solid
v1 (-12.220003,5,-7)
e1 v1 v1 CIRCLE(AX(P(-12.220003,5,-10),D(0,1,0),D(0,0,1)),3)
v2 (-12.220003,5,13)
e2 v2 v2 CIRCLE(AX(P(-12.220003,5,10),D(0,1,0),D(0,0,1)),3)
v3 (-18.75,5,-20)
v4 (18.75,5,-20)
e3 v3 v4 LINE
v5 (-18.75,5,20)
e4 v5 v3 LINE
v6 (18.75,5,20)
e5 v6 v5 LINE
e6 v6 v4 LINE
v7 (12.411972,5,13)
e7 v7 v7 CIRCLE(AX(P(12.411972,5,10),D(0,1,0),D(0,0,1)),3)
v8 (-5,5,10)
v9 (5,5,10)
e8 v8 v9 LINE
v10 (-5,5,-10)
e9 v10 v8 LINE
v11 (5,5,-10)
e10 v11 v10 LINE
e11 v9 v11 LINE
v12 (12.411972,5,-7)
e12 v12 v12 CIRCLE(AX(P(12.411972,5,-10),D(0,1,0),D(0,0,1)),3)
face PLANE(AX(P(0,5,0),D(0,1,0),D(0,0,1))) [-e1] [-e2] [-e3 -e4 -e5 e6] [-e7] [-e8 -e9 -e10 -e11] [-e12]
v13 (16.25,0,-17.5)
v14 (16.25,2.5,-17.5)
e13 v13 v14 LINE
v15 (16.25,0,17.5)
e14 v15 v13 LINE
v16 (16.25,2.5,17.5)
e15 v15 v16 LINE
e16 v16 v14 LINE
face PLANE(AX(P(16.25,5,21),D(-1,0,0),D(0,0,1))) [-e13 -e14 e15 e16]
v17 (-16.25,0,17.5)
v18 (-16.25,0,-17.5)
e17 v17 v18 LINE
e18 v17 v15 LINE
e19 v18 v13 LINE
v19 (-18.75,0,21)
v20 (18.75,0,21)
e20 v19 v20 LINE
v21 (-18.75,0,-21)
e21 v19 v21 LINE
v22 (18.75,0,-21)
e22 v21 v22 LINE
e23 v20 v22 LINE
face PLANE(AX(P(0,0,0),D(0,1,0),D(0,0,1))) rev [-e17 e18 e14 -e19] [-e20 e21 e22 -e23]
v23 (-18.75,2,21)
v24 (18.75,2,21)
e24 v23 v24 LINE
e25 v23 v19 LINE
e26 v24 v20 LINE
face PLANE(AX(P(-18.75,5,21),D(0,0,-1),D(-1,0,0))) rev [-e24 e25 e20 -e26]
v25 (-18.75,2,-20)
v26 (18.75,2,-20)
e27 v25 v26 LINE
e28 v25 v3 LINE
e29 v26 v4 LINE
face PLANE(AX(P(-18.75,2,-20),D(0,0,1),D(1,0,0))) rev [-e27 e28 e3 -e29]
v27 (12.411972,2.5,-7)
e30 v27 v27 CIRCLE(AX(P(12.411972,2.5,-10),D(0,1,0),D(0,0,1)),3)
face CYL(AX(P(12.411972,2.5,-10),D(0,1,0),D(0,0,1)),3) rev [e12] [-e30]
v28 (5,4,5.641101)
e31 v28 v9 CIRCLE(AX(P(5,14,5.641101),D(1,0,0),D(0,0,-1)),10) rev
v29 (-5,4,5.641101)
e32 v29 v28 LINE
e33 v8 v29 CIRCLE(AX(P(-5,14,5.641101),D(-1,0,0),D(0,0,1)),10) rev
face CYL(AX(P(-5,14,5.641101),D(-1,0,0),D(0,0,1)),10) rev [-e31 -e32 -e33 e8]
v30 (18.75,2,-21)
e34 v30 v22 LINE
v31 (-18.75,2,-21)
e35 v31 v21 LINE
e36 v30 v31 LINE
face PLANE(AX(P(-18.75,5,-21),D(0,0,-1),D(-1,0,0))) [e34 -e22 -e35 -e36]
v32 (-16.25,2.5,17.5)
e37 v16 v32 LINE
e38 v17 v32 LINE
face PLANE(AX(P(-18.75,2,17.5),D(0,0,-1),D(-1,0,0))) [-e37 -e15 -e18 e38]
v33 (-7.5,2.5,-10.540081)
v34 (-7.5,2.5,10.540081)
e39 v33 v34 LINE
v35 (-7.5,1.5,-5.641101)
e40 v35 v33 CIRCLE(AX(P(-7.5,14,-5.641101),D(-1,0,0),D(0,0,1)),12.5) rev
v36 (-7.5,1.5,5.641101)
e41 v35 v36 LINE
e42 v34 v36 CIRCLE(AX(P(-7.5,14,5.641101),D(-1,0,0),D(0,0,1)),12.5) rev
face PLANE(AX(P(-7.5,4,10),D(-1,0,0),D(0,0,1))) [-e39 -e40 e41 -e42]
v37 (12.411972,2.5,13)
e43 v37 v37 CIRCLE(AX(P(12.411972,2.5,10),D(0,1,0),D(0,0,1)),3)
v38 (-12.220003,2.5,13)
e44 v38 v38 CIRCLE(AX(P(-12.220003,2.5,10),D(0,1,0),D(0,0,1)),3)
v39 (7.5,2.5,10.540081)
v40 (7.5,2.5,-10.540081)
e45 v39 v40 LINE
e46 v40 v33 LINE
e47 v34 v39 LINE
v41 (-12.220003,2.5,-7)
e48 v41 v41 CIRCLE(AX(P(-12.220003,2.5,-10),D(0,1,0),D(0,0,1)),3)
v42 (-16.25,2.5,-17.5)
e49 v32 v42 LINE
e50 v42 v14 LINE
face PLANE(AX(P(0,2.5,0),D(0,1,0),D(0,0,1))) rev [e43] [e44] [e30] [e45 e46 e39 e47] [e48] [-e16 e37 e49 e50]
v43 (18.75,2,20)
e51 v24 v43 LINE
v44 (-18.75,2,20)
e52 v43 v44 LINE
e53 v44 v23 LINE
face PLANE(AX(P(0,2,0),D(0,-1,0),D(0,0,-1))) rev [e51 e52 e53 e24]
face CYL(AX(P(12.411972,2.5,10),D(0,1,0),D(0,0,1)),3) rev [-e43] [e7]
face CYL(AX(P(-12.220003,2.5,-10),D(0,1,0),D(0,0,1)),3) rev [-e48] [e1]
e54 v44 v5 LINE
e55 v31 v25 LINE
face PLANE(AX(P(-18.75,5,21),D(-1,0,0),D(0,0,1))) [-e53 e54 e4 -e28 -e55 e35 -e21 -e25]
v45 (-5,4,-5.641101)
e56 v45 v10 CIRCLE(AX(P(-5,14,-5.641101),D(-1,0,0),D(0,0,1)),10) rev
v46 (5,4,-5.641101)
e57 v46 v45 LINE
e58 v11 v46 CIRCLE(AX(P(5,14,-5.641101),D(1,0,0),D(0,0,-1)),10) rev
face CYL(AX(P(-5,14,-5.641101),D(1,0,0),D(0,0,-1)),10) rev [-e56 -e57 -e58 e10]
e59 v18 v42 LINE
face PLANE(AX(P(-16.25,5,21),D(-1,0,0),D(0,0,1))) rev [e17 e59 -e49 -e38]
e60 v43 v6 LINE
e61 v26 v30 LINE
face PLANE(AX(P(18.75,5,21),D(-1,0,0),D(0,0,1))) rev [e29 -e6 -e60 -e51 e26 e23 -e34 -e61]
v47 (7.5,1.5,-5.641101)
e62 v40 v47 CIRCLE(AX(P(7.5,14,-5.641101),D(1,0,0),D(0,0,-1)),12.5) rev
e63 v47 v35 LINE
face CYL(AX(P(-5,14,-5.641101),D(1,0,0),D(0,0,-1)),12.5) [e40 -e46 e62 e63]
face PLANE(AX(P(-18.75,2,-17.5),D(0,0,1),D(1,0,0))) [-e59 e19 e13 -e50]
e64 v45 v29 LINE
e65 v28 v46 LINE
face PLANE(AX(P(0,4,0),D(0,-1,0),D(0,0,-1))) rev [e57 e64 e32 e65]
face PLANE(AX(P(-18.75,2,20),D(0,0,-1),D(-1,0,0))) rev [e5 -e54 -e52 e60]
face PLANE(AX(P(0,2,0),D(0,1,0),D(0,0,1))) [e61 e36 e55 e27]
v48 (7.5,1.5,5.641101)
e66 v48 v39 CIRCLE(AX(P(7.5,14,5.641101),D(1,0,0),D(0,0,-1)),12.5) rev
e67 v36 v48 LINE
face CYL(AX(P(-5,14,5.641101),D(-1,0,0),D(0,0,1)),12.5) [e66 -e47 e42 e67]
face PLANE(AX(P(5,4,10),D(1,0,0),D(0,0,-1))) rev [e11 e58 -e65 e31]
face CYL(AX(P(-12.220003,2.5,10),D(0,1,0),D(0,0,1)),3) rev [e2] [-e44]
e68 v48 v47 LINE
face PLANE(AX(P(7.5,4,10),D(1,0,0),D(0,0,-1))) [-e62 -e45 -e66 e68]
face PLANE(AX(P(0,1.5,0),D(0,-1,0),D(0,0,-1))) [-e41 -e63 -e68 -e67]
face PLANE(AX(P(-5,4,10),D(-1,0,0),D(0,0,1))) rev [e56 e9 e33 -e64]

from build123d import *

# Parameters (mm, degrees)
SKETCH1_W           = 37.5
SKETCH1_H           = 42
BOSS_EXTRUDE1_DEPTH = 5
SKETCH2_W           = 37.5
SKETCH2_H           = 1
CUT_EXTRUDE1_DEPTH  = 3
SKETCH3_W           = 37.5
SKETCH3_H           = 1
CUT_EXTRUDE2_DEPTH  = 3
SKETCH4_W           = 10
SKETCH4_H           = 20
CUT_EXTRUDE3_DEPTH  = 1
FILLET1_R           = 10
FILLET2_R           = 10
SHELL1_START        = -16.25
SHELL1_DEPTH        = 32.5
SHELL1_2_DEPTH      = 8.75
SHELL1_START_2      = 7.5
SHELL1_3_DEPTH      = 8.75
SKETCH5_R           = 3
CUT_EXTRUDE4_DEPTH  = 2.5


# Read off the part's stored shape, not the designer's step: Shell1
with BuildPart() as part:
    # Sketch1 → Boss-Extrude1 (new body)
    with BuildSketch(Plane(origin=(0, 0, 0), x_dir=(1, 0, 0), z_dir=(0, 1, 0))):
        Rectangle(SKETCH1_W, SKETCH1_H)
    extrude(amount=BOSS_EXTRUDE1_DEPTH)

    # Sketch2 → Cut-Extrude1 (cut)
    with BuildSketch(Plane(origin=(0, 5, 0), x_dir=(1, 0, 0), z_dir=(0, 1, 0))):
        with Locations((0, -20.5)):
            Rectangle(SKETCH2_W, SKETCH2_H)
    extrude(amount=-CUT_EXTRUDE1_DEPTH, mode=Mode.SUBTRACT)

    # Sketch3 → Cut-Extrude2 (cut)
    with BuildSketch(Plane(origin=(0, 5, 0), x_dir=(1, 0, 0), z_dir=(0, 1, 0))):
        with Locations((0, 20.5)):
            Rectangle(SKETCH3_W, SKETCH3_H)
    extrude(amount=-CUT_EXTRUDE2_DEPTH, mode=Mode.SUBTRACT)

    # Sketch4 → Cut-Extrude3 (cut)
    with BuildSketch(Plane(origin=(0, 5, 0), x_dir=(1, 0, 0), z_dir=(0, 1, 0))):
        Rectangle(SKETCH4_W, SKETCH4_H)
    extrude(amount=-CUT_EXTRUDE3_DEPTH, mode=Mode.SUBTRACT)

    # Fillet1
    # the kernel refuses this fillet: 10 mm, written as the material it adds along each edge
    with BuildSketch(Plane(origin=(15.897247359, 4, -10), x_dir=(0, 1, 0), z_dir=(-1, 0, 0))) as fillet1_piece_1:
        with BuildLine():
            CenterArc((10, -4.358898944), FILLET1_R, 154.158067237, 25.841932763)
            Line((0, -4.358898944), (-0.2, -4.358898944))
            Line((-0.2, -4.358898944), (-0.2, 0))
            Line((-0.2, 0), (0, 0.2))
            ThreePointArc((0, 0.2), (0.5, 0.2), (0.82, 0.087177979))
            Line((0.82, 0.087177979), (1, 0))
        make_face()
    extrude(amount=31.794494718)

    # Fillet2
    # the kernel refuses this fillet: 10 mm, written as the material it adds along each edge
    with BuildSketch(Plane(origin=(-15.897247359, 4, 10), x_dir=(0, 0, -1), z_dir=(1, 0, 0))) as fillet2_piece_1:
        with BuildLine():
            CenterArc((4.358898944, 10), FILLET2_R, 244.158067237, 25.841932763)
            Line((0, 1), (-0.087177979, 0.82))
            ThreePointArc((-0.087177979, 0.82), (-0.2, 0.5), (-0.2, 0))
            Line((-0.2, 0), (0, -0.2))
            Line((0, -0.2), (4.358898944, -0.2))
            Line((4.358898944, -0.2), (4.358898944, 0))
        make_face()
    extrude(amount=31.794494718)

    # Shell1 outline → Shell1 (cut)
    with BuildSketch(Plane.YZ.offset(SHELL1_START)):
        with BuildLine():
            Line((0, -17.5), (2.5, -17.5))
            Line((2.5, -17.5), (2.5, -10.540080542))
            ThreePointArc((2.5, -10.540080542), (1.752551286, -8.141101056), (1.5, -5.641101056))
            Line((1.5, -5.641101056), (1.5, 5.641101056))
            ThreePointArc((1.5, 5.641101056), (1.752551286, 8.141101056), (2.5, 10.540080542))
            Line((2.5, 10.540080542), (2.5, 17.5))
            Line((2.5, 17.5), (0, 17.5))
            Line((0, 17.5), (0, -17.5))
        make_face()
    extrude(amount=SHELL1_DEPTH, mode=Mode.SUBTRACT)

    # Shell1 2 outline → Shell1 2 (cut)
    with BuildSketch(Plane.YZ.offset(SHELL1_START)):
        with BuildLine():
            ThreePointArc((1.5, -5.641101056), (1.752551286, -8.141101056), (2.5, -10.540080542))
            Line((2.5, -10.540080542), (2.5, 10.540080542))
            ThreePointArc((2.5, 10.540080542), (1.752551286, 8.141101056), (1.5, 5.641101056))
            Line((1.5, 5.641101056), (1.5, -5.641101056))
        make_face()
    extrude(amount=SHELL1_2_DEPTH, mode=Mode.SUBTRACT)

    # Shell1 3 outline → Shell1 3 (cut)
    with BuildSketch(Plane.YZ.offset(SHELL1_START_2)):
        with BuildLine():
            ThreePointArc((1.5, -5.641101056), (1.752551286, -8.141101056), (2.5, -10.540080542))
            Line((2.5, -10.540080542), (2.5, 10.540080542))
            ThreePointArc((2.5, 10.540080542), (1.752551286, 8.141101056), (1.5, 5.641101056))
            Line((1.5, 5.641101056), (1.5, -5.641101056))
        make_face()
    extrude(amount=SHELL1_3_DEPTH, mode=Mode.SUBTRACT)

    # Sketch5 → Cut-Extrude4 (cut)
    with BuildSketch(Plane(origin=(0, 5, 0), x_dir=(1, 0, 0), z_dir=(0, 1, 0))):
        with Locations(Location((-12.220002529, -10, 0), (0, 0, 270))):
            Circle(SKETCH5_R)
        with Locations(Location((-12.220002529, 10, 0), (0, 0, 270))):
            Circle(SKETCH5_R)
        with Locations(Location((12.411971657, -10, 0), (0, 0, 270))):
            Circle(SKETCH5_R)
        with Locations(Location((12.411971657, 10, 0), (0, 0, 270))):
            Circle(SKETCH5_R)
    extrude(amount=-CUT_EXTRUDE4_DEPTH, mode=Mode.SUBTRACT)


solid = part.part
